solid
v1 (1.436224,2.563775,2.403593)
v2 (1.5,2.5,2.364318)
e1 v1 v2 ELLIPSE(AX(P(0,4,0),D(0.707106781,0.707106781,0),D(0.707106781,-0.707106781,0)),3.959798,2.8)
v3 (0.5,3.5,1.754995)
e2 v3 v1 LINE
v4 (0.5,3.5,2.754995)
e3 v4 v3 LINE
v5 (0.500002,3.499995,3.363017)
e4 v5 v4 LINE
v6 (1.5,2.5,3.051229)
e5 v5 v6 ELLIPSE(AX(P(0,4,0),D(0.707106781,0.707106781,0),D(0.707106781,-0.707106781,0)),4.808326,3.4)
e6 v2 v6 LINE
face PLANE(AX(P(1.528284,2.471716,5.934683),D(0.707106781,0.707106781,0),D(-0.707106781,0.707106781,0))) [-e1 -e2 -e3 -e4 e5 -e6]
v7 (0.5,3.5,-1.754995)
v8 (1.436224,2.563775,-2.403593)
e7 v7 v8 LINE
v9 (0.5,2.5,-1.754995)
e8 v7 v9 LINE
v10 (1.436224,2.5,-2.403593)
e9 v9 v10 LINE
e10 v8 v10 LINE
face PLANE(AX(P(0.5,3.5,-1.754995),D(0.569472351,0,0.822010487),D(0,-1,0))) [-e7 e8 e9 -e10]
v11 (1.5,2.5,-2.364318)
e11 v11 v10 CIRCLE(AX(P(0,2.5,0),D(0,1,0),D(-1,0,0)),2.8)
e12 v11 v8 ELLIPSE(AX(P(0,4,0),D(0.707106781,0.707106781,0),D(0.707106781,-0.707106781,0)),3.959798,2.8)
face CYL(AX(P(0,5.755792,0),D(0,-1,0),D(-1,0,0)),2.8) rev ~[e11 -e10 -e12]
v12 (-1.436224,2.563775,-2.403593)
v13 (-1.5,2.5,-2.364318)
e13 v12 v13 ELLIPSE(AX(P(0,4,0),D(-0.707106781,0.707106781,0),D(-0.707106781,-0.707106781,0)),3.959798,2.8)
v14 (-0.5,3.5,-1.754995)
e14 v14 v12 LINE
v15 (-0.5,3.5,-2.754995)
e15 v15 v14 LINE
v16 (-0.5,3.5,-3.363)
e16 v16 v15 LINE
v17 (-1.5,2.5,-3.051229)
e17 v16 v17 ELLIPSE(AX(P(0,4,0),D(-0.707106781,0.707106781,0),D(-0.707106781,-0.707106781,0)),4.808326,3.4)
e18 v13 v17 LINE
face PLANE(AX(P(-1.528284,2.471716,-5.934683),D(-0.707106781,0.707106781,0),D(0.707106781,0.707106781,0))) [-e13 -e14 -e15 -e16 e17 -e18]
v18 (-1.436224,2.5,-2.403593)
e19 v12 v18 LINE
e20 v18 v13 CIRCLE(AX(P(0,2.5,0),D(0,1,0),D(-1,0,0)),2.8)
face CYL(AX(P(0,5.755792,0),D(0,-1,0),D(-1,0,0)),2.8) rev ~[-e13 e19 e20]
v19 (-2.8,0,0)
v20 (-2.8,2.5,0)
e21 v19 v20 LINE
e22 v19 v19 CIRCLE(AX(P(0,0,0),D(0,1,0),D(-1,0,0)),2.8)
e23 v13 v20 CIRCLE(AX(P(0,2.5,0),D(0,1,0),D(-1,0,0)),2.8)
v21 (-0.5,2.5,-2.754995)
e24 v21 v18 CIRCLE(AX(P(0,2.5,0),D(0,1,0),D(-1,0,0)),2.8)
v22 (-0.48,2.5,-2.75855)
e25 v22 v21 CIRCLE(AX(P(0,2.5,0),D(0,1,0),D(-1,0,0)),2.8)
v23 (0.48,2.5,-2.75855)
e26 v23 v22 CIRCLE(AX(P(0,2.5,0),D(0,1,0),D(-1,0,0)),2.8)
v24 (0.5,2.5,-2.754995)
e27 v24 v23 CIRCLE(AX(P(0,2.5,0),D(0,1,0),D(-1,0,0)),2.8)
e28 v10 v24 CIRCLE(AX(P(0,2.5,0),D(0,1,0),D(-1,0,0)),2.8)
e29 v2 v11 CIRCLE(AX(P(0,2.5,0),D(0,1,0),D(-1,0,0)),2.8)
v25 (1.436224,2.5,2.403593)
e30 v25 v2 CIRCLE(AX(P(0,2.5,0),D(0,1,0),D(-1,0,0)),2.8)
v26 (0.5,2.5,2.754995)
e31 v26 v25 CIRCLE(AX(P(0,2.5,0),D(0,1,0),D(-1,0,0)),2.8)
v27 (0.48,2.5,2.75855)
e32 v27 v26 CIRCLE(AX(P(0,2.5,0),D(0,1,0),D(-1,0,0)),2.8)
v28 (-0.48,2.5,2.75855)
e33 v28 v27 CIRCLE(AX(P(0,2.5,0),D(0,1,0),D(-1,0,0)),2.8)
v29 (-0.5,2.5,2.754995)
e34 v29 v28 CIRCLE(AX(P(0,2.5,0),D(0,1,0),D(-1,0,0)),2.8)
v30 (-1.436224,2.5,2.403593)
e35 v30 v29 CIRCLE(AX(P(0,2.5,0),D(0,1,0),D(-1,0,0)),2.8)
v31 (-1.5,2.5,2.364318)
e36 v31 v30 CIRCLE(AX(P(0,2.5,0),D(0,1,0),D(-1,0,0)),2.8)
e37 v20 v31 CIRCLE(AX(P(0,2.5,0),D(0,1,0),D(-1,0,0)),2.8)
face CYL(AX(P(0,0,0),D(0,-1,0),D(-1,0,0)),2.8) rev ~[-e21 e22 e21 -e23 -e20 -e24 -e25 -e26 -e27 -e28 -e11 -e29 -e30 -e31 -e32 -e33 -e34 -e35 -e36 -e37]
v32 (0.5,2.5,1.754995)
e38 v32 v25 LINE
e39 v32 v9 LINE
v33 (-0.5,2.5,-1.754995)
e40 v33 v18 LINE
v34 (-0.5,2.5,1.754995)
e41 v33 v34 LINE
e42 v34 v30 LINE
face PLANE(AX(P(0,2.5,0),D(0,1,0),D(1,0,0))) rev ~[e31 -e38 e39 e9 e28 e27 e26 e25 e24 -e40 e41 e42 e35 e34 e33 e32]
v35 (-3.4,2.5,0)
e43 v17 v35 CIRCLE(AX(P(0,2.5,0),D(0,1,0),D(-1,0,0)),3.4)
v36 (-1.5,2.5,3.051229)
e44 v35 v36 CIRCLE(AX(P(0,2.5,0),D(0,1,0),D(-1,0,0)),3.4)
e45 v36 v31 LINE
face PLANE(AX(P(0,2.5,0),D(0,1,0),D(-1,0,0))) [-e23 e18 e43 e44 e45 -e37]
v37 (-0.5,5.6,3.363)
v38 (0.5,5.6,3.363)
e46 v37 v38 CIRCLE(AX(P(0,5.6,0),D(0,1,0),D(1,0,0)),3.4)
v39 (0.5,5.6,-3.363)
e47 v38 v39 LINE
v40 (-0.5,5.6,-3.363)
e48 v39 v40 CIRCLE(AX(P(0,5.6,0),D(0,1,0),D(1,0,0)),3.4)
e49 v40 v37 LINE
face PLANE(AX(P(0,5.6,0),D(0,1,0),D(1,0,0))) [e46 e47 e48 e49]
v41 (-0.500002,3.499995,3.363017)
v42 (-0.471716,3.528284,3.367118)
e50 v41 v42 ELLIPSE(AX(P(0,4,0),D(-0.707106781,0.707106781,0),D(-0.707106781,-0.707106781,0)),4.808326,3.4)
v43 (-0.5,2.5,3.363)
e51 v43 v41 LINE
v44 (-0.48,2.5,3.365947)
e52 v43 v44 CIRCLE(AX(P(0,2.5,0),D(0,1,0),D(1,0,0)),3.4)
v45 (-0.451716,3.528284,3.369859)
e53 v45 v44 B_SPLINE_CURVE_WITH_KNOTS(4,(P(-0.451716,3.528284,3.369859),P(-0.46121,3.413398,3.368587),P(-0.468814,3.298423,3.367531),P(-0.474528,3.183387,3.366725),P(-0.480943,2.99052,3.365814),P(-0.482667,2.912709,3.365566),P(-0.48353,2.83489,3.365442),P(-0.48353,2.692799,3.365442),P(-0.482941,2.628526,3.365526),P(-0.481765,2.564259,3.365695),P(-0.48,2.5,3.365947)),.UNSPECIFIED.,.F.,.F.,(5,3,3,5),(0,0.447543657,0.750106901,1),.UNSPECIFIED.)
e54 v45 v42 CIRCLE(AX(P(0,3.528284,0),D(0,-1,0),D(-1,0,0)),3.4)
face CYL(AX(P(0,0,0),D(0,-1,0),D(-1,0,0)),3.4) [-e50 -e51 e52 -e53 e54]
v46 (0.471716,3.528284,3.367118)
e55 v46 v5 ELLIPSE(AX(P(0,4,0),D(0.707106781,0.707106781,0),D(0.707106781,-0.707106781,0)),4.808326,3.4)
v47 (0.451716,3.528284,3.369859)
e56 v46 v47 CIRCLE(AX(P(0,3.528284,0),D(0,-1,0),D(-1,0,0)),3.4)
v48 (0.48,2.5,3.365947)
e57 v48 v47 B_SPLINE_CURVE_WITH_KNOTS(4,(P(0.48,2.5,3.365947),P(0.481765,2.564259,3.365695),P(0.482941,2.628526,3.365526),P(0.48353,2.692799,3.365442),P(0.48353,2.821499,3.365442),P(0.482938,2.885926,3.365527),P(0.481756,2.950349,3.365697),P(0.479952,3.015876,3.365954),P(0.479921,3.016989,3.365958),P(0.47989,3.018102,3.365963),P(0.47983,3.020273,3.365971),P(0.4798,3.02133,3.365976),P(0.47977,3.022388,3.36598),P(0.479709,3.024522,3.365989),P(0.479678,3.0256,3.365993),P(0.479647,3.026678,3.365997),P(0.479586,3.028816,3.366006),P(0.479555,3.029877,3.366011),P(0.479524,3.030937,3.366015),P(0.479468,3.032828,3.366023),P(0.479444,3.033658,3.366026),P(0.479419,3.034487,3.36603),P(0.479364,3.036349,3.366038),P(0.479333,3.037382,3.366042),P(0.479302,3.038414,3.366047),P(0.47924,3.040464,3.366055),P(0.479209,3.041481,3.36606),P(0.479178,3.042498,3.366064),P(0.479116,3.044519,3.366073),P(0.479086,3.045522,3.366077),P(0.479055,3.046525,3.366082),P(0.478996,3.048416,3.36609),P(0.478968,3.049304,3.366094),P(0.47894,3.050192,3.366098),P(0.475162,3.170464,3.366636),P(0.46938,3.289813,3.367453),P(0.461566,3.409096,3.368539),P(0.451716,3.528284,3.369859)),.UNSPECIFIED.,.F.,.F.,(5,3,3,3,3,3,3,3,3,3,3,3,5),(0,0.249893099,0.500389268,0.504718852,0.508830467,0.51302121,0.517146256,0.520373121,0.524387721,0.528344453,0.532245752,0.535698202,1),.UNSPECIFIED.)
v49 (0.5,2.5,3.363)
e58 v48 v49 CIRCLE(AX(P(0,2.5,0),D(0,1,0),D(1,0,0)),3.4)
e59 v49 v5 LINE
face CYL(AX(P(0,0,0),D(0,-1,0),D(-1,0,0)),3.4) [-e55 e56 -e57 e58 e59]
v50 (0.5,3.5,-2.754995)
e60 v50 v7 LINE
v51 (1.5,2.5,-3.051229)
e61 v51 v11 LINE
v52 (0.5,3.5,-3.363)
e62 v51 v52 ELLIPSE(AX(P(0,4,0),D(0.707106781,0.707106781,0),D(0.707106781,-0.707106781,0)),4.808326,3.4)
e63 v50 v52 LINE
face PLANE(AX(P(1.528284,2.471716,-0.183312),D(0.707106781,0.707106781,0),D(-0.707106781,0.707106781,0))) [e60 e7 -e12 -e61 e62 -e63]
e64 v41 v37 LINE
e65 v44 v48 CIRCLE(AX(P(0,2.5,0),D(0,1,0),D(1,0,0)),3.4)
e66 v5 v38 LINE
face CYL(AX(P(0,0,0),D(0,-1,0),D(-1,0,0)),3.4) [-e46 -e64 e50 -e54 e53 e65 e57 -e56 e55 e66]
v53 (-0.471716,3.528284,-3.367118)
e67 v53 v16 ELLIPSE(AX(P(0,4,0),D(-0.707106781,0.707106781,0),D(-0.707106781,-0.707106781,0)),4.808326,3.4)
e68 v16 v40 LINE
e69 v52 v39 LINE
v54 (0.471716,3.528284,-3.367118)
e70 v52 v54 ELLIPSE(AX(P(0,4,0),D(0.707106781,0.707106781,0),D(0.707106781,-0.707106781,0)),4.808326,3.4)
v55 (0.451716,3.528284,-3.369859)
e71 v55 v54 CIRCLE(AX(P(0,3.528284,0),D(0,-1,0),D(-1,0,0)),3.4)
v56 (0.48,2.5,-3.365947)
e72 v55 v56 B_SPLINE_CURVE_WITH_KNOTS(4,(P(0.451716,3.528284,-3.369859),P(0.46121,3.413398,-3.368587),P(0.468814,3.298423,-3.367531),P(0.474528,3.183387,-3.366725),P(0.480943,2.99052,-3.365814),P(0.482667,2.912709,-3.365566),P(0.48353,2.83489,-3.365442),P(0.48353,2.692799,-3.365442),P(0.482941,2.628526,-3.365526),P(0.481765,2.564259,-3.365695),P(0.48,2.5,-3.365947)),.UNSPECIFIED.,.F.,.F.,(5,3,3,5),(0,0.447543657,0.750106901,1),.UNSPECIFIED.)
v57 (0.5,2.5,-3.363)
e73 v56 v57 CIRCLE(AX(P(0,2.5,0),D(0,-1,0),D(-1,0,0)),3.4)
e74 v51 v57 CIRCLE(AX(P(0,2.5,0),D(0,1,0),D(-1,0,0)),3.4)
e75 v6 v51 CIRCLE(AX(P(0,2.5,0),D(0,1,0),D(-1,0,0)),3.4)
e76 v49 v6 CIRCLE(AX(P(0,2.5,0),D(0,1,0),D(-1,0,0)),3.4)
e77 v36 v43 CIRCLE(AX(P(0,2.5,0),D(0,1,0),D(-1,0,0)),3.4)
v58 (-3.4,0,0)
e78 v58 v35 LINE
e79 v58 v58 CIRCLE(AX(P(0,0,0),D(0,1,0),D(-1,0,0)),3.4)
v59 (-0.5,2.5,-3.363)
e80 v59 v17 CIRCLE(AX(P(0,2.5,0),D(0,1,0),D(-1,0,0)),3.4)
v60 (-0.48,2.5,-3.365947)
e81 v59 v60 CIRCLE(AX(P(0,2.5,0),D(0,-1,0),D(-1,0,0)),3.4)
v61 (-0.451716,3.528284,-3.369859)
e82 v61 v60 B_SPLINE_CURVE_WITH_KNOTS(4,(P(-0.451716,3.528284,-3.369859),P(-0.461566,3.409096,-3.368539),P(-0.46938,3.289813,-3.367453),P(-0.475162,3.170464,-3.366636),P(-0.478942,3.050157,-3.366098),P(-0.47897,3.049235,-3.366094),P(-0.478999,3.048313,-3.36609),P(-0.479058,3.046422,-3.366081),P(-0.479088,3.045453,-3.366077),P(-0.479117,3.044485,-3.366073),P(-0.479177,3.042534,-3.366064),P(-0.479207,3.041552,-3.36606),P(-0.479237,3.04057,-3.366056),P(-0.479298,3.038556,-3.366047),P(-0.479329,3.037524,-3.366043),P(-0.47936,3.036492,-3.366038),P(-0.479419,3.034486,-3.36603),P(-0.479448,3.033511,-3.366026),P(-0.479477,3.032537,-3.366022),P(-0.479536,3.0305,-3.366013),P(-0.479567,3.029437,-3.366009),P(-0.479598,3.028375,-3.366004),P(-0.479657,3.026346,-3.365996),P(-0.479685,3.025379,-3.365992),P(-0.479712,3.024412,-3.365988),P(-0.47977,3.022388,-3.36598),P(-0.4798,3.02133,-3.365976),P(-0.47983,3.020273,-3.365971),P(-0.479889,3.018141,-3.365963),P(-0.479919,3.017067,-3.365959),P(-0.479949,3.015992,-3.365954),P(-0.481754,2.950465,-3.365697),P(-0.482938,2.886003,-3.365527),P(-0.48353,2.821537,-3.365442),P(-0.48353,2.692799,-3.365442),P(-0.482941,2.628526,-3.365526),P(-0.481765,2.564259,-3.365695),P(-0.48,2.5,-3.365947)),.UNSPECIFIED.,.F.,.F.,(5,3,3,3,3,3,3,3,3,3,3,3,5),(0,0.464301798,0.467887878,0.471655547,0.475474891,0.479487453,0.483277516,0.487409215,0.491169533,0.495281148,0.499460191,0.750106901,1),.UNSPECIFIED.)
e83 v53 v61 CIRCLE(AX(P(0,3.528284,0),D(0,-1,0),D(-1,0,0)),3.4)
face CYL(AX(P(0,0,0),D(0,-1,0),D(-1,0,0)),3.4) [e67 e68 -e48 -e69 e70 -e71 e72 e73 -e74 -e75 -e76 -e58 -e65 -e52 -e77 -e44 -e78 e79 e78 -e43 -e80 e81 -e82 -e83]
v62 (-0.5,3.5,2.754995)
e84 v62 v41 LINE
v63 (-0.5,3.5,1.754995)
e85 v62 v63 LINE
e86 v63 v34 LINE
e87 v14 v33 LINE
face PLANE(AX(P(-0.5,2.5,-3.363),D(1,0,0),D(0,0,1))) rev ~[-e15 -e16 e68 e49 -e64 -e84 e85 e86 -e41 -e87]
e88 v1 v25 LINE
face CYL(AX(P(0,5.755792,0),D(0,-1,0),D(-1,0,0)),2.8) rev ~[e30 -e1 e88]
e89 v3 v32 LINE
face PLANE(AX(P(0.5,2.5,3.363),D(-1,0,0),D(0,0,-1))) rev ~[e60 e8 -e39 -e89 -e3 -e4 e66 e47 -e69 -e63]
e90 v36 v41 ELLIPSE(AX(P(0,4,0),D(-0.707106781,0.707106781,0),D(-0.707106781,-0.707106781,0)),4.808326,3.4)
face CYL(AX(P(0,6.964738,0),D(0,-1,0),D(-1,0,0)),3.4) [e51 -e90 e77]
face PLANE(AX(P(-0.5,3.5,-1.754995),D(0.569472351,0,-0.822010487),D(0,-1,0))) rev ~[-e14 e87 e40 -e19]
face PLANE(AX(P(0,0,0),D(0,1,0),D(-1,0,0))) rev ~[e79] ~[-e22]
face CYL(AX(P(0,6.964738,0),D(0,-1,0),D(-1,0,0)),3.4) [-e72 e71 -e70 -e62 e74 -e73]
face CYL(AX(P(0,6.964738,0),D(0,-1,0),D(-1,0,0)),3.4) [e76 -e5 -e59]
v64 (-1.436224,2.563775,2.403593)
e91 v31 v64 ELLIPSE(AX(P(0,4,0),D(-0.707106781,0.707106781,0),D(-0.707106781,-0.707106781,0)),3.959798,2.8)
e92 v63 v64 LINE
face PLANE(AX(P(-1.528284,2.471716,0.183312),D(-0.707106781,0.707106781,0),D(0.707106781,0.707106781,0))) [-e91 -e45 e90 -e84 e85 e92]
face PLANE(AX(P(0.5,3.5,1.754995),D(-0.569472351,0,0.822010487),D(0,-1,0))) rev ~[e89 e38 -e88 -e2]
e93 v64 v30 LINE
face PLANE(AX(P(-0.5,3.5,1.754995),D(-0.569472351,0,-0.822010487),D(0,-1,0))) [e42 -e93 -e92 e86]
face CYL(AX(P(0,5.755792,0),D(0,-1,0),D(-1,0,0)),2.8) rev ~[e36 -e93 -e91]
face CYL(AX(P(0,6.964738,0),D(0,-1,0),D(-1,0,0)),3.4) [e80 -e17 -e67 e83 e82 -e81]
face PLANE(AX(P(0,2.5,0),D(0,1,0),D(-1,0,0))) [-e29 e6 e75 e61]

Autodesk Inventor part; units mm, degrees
ref_plane "YZ Plane" through (0, 0, 0) normal (1, 0, 0) x (0, 1, 0)
ref_plane "XZ Plane" through (0, 0, 0) normal (0, 1, 0) x (-1, 0, 0)
ref_plane "XY Plane" through (0, 0, 0) normal (0, 0, 1) x (1, 0, 0)
sketch "스케치1" plane through (0, 0, 0) normal (0, 1, 0) x (-1, 0, 0)
  circle A0 centre (0, 0) radius 2.8
  circle A1 centre (0, 0) radius 3.4
  dimension "d0" = 5.6
  dimension "d1" = 6.8
extrude "돌출1" add sketch "스케치1" along normal blind 2.5
sketch "스케치2" plane through (0, 2.5, 0) normal (0, 1, 0) x (1, 0, 0)
  circle A0 centre (0, 0) radius 3.4 projected
  circle A1 centre (0, 0) radius 3.4 projected
  line L0 (0.5, 3.363) -> (-0.5, 3.363)
  line L1 (-0.5, 3.363) -> (-0.5, -3.363)
  line L2 (-0.5, -3.363) -> (0.5, -3.363)
  line L3 (0.5, -3.363) -> (0.5, 3.363)
  line L4 (0.5, 3.363) -> (-0.5, -3.363) construction
  line L5 (-0.5, 3.363) -> (0.5, -3.363) construction
  point P0 (-0.5, -3.363)
  point P1 (0.5, -3.363)
  point P2 (0.5, 3.363)
  point P3 (-0.5, 3.363)
  dimension "d4" = 1
extrude "돌출2" add sketch "스케치2" along normal blind 3.1 contours L0 A0 | L3 L2 L1 L0 | A0 L2
chamfer "모따기1" distance 1 angle 45 4 edges at (0.5, 2.5, 3.059) (0.5, 2.5, -3.059) (-0.5, 2.5, -3.059) (-0.5, 2.5, 3.059)
chamfer "모따기2" distance 1 angle 45 4 edges at (-0.5, 3, -2.755) (-0.5, 3, 2.755) (0.5, 3, 2.755) (0.5, 3, -2.755)
properties part number "terminalcap_4.1mm_addon_large"
